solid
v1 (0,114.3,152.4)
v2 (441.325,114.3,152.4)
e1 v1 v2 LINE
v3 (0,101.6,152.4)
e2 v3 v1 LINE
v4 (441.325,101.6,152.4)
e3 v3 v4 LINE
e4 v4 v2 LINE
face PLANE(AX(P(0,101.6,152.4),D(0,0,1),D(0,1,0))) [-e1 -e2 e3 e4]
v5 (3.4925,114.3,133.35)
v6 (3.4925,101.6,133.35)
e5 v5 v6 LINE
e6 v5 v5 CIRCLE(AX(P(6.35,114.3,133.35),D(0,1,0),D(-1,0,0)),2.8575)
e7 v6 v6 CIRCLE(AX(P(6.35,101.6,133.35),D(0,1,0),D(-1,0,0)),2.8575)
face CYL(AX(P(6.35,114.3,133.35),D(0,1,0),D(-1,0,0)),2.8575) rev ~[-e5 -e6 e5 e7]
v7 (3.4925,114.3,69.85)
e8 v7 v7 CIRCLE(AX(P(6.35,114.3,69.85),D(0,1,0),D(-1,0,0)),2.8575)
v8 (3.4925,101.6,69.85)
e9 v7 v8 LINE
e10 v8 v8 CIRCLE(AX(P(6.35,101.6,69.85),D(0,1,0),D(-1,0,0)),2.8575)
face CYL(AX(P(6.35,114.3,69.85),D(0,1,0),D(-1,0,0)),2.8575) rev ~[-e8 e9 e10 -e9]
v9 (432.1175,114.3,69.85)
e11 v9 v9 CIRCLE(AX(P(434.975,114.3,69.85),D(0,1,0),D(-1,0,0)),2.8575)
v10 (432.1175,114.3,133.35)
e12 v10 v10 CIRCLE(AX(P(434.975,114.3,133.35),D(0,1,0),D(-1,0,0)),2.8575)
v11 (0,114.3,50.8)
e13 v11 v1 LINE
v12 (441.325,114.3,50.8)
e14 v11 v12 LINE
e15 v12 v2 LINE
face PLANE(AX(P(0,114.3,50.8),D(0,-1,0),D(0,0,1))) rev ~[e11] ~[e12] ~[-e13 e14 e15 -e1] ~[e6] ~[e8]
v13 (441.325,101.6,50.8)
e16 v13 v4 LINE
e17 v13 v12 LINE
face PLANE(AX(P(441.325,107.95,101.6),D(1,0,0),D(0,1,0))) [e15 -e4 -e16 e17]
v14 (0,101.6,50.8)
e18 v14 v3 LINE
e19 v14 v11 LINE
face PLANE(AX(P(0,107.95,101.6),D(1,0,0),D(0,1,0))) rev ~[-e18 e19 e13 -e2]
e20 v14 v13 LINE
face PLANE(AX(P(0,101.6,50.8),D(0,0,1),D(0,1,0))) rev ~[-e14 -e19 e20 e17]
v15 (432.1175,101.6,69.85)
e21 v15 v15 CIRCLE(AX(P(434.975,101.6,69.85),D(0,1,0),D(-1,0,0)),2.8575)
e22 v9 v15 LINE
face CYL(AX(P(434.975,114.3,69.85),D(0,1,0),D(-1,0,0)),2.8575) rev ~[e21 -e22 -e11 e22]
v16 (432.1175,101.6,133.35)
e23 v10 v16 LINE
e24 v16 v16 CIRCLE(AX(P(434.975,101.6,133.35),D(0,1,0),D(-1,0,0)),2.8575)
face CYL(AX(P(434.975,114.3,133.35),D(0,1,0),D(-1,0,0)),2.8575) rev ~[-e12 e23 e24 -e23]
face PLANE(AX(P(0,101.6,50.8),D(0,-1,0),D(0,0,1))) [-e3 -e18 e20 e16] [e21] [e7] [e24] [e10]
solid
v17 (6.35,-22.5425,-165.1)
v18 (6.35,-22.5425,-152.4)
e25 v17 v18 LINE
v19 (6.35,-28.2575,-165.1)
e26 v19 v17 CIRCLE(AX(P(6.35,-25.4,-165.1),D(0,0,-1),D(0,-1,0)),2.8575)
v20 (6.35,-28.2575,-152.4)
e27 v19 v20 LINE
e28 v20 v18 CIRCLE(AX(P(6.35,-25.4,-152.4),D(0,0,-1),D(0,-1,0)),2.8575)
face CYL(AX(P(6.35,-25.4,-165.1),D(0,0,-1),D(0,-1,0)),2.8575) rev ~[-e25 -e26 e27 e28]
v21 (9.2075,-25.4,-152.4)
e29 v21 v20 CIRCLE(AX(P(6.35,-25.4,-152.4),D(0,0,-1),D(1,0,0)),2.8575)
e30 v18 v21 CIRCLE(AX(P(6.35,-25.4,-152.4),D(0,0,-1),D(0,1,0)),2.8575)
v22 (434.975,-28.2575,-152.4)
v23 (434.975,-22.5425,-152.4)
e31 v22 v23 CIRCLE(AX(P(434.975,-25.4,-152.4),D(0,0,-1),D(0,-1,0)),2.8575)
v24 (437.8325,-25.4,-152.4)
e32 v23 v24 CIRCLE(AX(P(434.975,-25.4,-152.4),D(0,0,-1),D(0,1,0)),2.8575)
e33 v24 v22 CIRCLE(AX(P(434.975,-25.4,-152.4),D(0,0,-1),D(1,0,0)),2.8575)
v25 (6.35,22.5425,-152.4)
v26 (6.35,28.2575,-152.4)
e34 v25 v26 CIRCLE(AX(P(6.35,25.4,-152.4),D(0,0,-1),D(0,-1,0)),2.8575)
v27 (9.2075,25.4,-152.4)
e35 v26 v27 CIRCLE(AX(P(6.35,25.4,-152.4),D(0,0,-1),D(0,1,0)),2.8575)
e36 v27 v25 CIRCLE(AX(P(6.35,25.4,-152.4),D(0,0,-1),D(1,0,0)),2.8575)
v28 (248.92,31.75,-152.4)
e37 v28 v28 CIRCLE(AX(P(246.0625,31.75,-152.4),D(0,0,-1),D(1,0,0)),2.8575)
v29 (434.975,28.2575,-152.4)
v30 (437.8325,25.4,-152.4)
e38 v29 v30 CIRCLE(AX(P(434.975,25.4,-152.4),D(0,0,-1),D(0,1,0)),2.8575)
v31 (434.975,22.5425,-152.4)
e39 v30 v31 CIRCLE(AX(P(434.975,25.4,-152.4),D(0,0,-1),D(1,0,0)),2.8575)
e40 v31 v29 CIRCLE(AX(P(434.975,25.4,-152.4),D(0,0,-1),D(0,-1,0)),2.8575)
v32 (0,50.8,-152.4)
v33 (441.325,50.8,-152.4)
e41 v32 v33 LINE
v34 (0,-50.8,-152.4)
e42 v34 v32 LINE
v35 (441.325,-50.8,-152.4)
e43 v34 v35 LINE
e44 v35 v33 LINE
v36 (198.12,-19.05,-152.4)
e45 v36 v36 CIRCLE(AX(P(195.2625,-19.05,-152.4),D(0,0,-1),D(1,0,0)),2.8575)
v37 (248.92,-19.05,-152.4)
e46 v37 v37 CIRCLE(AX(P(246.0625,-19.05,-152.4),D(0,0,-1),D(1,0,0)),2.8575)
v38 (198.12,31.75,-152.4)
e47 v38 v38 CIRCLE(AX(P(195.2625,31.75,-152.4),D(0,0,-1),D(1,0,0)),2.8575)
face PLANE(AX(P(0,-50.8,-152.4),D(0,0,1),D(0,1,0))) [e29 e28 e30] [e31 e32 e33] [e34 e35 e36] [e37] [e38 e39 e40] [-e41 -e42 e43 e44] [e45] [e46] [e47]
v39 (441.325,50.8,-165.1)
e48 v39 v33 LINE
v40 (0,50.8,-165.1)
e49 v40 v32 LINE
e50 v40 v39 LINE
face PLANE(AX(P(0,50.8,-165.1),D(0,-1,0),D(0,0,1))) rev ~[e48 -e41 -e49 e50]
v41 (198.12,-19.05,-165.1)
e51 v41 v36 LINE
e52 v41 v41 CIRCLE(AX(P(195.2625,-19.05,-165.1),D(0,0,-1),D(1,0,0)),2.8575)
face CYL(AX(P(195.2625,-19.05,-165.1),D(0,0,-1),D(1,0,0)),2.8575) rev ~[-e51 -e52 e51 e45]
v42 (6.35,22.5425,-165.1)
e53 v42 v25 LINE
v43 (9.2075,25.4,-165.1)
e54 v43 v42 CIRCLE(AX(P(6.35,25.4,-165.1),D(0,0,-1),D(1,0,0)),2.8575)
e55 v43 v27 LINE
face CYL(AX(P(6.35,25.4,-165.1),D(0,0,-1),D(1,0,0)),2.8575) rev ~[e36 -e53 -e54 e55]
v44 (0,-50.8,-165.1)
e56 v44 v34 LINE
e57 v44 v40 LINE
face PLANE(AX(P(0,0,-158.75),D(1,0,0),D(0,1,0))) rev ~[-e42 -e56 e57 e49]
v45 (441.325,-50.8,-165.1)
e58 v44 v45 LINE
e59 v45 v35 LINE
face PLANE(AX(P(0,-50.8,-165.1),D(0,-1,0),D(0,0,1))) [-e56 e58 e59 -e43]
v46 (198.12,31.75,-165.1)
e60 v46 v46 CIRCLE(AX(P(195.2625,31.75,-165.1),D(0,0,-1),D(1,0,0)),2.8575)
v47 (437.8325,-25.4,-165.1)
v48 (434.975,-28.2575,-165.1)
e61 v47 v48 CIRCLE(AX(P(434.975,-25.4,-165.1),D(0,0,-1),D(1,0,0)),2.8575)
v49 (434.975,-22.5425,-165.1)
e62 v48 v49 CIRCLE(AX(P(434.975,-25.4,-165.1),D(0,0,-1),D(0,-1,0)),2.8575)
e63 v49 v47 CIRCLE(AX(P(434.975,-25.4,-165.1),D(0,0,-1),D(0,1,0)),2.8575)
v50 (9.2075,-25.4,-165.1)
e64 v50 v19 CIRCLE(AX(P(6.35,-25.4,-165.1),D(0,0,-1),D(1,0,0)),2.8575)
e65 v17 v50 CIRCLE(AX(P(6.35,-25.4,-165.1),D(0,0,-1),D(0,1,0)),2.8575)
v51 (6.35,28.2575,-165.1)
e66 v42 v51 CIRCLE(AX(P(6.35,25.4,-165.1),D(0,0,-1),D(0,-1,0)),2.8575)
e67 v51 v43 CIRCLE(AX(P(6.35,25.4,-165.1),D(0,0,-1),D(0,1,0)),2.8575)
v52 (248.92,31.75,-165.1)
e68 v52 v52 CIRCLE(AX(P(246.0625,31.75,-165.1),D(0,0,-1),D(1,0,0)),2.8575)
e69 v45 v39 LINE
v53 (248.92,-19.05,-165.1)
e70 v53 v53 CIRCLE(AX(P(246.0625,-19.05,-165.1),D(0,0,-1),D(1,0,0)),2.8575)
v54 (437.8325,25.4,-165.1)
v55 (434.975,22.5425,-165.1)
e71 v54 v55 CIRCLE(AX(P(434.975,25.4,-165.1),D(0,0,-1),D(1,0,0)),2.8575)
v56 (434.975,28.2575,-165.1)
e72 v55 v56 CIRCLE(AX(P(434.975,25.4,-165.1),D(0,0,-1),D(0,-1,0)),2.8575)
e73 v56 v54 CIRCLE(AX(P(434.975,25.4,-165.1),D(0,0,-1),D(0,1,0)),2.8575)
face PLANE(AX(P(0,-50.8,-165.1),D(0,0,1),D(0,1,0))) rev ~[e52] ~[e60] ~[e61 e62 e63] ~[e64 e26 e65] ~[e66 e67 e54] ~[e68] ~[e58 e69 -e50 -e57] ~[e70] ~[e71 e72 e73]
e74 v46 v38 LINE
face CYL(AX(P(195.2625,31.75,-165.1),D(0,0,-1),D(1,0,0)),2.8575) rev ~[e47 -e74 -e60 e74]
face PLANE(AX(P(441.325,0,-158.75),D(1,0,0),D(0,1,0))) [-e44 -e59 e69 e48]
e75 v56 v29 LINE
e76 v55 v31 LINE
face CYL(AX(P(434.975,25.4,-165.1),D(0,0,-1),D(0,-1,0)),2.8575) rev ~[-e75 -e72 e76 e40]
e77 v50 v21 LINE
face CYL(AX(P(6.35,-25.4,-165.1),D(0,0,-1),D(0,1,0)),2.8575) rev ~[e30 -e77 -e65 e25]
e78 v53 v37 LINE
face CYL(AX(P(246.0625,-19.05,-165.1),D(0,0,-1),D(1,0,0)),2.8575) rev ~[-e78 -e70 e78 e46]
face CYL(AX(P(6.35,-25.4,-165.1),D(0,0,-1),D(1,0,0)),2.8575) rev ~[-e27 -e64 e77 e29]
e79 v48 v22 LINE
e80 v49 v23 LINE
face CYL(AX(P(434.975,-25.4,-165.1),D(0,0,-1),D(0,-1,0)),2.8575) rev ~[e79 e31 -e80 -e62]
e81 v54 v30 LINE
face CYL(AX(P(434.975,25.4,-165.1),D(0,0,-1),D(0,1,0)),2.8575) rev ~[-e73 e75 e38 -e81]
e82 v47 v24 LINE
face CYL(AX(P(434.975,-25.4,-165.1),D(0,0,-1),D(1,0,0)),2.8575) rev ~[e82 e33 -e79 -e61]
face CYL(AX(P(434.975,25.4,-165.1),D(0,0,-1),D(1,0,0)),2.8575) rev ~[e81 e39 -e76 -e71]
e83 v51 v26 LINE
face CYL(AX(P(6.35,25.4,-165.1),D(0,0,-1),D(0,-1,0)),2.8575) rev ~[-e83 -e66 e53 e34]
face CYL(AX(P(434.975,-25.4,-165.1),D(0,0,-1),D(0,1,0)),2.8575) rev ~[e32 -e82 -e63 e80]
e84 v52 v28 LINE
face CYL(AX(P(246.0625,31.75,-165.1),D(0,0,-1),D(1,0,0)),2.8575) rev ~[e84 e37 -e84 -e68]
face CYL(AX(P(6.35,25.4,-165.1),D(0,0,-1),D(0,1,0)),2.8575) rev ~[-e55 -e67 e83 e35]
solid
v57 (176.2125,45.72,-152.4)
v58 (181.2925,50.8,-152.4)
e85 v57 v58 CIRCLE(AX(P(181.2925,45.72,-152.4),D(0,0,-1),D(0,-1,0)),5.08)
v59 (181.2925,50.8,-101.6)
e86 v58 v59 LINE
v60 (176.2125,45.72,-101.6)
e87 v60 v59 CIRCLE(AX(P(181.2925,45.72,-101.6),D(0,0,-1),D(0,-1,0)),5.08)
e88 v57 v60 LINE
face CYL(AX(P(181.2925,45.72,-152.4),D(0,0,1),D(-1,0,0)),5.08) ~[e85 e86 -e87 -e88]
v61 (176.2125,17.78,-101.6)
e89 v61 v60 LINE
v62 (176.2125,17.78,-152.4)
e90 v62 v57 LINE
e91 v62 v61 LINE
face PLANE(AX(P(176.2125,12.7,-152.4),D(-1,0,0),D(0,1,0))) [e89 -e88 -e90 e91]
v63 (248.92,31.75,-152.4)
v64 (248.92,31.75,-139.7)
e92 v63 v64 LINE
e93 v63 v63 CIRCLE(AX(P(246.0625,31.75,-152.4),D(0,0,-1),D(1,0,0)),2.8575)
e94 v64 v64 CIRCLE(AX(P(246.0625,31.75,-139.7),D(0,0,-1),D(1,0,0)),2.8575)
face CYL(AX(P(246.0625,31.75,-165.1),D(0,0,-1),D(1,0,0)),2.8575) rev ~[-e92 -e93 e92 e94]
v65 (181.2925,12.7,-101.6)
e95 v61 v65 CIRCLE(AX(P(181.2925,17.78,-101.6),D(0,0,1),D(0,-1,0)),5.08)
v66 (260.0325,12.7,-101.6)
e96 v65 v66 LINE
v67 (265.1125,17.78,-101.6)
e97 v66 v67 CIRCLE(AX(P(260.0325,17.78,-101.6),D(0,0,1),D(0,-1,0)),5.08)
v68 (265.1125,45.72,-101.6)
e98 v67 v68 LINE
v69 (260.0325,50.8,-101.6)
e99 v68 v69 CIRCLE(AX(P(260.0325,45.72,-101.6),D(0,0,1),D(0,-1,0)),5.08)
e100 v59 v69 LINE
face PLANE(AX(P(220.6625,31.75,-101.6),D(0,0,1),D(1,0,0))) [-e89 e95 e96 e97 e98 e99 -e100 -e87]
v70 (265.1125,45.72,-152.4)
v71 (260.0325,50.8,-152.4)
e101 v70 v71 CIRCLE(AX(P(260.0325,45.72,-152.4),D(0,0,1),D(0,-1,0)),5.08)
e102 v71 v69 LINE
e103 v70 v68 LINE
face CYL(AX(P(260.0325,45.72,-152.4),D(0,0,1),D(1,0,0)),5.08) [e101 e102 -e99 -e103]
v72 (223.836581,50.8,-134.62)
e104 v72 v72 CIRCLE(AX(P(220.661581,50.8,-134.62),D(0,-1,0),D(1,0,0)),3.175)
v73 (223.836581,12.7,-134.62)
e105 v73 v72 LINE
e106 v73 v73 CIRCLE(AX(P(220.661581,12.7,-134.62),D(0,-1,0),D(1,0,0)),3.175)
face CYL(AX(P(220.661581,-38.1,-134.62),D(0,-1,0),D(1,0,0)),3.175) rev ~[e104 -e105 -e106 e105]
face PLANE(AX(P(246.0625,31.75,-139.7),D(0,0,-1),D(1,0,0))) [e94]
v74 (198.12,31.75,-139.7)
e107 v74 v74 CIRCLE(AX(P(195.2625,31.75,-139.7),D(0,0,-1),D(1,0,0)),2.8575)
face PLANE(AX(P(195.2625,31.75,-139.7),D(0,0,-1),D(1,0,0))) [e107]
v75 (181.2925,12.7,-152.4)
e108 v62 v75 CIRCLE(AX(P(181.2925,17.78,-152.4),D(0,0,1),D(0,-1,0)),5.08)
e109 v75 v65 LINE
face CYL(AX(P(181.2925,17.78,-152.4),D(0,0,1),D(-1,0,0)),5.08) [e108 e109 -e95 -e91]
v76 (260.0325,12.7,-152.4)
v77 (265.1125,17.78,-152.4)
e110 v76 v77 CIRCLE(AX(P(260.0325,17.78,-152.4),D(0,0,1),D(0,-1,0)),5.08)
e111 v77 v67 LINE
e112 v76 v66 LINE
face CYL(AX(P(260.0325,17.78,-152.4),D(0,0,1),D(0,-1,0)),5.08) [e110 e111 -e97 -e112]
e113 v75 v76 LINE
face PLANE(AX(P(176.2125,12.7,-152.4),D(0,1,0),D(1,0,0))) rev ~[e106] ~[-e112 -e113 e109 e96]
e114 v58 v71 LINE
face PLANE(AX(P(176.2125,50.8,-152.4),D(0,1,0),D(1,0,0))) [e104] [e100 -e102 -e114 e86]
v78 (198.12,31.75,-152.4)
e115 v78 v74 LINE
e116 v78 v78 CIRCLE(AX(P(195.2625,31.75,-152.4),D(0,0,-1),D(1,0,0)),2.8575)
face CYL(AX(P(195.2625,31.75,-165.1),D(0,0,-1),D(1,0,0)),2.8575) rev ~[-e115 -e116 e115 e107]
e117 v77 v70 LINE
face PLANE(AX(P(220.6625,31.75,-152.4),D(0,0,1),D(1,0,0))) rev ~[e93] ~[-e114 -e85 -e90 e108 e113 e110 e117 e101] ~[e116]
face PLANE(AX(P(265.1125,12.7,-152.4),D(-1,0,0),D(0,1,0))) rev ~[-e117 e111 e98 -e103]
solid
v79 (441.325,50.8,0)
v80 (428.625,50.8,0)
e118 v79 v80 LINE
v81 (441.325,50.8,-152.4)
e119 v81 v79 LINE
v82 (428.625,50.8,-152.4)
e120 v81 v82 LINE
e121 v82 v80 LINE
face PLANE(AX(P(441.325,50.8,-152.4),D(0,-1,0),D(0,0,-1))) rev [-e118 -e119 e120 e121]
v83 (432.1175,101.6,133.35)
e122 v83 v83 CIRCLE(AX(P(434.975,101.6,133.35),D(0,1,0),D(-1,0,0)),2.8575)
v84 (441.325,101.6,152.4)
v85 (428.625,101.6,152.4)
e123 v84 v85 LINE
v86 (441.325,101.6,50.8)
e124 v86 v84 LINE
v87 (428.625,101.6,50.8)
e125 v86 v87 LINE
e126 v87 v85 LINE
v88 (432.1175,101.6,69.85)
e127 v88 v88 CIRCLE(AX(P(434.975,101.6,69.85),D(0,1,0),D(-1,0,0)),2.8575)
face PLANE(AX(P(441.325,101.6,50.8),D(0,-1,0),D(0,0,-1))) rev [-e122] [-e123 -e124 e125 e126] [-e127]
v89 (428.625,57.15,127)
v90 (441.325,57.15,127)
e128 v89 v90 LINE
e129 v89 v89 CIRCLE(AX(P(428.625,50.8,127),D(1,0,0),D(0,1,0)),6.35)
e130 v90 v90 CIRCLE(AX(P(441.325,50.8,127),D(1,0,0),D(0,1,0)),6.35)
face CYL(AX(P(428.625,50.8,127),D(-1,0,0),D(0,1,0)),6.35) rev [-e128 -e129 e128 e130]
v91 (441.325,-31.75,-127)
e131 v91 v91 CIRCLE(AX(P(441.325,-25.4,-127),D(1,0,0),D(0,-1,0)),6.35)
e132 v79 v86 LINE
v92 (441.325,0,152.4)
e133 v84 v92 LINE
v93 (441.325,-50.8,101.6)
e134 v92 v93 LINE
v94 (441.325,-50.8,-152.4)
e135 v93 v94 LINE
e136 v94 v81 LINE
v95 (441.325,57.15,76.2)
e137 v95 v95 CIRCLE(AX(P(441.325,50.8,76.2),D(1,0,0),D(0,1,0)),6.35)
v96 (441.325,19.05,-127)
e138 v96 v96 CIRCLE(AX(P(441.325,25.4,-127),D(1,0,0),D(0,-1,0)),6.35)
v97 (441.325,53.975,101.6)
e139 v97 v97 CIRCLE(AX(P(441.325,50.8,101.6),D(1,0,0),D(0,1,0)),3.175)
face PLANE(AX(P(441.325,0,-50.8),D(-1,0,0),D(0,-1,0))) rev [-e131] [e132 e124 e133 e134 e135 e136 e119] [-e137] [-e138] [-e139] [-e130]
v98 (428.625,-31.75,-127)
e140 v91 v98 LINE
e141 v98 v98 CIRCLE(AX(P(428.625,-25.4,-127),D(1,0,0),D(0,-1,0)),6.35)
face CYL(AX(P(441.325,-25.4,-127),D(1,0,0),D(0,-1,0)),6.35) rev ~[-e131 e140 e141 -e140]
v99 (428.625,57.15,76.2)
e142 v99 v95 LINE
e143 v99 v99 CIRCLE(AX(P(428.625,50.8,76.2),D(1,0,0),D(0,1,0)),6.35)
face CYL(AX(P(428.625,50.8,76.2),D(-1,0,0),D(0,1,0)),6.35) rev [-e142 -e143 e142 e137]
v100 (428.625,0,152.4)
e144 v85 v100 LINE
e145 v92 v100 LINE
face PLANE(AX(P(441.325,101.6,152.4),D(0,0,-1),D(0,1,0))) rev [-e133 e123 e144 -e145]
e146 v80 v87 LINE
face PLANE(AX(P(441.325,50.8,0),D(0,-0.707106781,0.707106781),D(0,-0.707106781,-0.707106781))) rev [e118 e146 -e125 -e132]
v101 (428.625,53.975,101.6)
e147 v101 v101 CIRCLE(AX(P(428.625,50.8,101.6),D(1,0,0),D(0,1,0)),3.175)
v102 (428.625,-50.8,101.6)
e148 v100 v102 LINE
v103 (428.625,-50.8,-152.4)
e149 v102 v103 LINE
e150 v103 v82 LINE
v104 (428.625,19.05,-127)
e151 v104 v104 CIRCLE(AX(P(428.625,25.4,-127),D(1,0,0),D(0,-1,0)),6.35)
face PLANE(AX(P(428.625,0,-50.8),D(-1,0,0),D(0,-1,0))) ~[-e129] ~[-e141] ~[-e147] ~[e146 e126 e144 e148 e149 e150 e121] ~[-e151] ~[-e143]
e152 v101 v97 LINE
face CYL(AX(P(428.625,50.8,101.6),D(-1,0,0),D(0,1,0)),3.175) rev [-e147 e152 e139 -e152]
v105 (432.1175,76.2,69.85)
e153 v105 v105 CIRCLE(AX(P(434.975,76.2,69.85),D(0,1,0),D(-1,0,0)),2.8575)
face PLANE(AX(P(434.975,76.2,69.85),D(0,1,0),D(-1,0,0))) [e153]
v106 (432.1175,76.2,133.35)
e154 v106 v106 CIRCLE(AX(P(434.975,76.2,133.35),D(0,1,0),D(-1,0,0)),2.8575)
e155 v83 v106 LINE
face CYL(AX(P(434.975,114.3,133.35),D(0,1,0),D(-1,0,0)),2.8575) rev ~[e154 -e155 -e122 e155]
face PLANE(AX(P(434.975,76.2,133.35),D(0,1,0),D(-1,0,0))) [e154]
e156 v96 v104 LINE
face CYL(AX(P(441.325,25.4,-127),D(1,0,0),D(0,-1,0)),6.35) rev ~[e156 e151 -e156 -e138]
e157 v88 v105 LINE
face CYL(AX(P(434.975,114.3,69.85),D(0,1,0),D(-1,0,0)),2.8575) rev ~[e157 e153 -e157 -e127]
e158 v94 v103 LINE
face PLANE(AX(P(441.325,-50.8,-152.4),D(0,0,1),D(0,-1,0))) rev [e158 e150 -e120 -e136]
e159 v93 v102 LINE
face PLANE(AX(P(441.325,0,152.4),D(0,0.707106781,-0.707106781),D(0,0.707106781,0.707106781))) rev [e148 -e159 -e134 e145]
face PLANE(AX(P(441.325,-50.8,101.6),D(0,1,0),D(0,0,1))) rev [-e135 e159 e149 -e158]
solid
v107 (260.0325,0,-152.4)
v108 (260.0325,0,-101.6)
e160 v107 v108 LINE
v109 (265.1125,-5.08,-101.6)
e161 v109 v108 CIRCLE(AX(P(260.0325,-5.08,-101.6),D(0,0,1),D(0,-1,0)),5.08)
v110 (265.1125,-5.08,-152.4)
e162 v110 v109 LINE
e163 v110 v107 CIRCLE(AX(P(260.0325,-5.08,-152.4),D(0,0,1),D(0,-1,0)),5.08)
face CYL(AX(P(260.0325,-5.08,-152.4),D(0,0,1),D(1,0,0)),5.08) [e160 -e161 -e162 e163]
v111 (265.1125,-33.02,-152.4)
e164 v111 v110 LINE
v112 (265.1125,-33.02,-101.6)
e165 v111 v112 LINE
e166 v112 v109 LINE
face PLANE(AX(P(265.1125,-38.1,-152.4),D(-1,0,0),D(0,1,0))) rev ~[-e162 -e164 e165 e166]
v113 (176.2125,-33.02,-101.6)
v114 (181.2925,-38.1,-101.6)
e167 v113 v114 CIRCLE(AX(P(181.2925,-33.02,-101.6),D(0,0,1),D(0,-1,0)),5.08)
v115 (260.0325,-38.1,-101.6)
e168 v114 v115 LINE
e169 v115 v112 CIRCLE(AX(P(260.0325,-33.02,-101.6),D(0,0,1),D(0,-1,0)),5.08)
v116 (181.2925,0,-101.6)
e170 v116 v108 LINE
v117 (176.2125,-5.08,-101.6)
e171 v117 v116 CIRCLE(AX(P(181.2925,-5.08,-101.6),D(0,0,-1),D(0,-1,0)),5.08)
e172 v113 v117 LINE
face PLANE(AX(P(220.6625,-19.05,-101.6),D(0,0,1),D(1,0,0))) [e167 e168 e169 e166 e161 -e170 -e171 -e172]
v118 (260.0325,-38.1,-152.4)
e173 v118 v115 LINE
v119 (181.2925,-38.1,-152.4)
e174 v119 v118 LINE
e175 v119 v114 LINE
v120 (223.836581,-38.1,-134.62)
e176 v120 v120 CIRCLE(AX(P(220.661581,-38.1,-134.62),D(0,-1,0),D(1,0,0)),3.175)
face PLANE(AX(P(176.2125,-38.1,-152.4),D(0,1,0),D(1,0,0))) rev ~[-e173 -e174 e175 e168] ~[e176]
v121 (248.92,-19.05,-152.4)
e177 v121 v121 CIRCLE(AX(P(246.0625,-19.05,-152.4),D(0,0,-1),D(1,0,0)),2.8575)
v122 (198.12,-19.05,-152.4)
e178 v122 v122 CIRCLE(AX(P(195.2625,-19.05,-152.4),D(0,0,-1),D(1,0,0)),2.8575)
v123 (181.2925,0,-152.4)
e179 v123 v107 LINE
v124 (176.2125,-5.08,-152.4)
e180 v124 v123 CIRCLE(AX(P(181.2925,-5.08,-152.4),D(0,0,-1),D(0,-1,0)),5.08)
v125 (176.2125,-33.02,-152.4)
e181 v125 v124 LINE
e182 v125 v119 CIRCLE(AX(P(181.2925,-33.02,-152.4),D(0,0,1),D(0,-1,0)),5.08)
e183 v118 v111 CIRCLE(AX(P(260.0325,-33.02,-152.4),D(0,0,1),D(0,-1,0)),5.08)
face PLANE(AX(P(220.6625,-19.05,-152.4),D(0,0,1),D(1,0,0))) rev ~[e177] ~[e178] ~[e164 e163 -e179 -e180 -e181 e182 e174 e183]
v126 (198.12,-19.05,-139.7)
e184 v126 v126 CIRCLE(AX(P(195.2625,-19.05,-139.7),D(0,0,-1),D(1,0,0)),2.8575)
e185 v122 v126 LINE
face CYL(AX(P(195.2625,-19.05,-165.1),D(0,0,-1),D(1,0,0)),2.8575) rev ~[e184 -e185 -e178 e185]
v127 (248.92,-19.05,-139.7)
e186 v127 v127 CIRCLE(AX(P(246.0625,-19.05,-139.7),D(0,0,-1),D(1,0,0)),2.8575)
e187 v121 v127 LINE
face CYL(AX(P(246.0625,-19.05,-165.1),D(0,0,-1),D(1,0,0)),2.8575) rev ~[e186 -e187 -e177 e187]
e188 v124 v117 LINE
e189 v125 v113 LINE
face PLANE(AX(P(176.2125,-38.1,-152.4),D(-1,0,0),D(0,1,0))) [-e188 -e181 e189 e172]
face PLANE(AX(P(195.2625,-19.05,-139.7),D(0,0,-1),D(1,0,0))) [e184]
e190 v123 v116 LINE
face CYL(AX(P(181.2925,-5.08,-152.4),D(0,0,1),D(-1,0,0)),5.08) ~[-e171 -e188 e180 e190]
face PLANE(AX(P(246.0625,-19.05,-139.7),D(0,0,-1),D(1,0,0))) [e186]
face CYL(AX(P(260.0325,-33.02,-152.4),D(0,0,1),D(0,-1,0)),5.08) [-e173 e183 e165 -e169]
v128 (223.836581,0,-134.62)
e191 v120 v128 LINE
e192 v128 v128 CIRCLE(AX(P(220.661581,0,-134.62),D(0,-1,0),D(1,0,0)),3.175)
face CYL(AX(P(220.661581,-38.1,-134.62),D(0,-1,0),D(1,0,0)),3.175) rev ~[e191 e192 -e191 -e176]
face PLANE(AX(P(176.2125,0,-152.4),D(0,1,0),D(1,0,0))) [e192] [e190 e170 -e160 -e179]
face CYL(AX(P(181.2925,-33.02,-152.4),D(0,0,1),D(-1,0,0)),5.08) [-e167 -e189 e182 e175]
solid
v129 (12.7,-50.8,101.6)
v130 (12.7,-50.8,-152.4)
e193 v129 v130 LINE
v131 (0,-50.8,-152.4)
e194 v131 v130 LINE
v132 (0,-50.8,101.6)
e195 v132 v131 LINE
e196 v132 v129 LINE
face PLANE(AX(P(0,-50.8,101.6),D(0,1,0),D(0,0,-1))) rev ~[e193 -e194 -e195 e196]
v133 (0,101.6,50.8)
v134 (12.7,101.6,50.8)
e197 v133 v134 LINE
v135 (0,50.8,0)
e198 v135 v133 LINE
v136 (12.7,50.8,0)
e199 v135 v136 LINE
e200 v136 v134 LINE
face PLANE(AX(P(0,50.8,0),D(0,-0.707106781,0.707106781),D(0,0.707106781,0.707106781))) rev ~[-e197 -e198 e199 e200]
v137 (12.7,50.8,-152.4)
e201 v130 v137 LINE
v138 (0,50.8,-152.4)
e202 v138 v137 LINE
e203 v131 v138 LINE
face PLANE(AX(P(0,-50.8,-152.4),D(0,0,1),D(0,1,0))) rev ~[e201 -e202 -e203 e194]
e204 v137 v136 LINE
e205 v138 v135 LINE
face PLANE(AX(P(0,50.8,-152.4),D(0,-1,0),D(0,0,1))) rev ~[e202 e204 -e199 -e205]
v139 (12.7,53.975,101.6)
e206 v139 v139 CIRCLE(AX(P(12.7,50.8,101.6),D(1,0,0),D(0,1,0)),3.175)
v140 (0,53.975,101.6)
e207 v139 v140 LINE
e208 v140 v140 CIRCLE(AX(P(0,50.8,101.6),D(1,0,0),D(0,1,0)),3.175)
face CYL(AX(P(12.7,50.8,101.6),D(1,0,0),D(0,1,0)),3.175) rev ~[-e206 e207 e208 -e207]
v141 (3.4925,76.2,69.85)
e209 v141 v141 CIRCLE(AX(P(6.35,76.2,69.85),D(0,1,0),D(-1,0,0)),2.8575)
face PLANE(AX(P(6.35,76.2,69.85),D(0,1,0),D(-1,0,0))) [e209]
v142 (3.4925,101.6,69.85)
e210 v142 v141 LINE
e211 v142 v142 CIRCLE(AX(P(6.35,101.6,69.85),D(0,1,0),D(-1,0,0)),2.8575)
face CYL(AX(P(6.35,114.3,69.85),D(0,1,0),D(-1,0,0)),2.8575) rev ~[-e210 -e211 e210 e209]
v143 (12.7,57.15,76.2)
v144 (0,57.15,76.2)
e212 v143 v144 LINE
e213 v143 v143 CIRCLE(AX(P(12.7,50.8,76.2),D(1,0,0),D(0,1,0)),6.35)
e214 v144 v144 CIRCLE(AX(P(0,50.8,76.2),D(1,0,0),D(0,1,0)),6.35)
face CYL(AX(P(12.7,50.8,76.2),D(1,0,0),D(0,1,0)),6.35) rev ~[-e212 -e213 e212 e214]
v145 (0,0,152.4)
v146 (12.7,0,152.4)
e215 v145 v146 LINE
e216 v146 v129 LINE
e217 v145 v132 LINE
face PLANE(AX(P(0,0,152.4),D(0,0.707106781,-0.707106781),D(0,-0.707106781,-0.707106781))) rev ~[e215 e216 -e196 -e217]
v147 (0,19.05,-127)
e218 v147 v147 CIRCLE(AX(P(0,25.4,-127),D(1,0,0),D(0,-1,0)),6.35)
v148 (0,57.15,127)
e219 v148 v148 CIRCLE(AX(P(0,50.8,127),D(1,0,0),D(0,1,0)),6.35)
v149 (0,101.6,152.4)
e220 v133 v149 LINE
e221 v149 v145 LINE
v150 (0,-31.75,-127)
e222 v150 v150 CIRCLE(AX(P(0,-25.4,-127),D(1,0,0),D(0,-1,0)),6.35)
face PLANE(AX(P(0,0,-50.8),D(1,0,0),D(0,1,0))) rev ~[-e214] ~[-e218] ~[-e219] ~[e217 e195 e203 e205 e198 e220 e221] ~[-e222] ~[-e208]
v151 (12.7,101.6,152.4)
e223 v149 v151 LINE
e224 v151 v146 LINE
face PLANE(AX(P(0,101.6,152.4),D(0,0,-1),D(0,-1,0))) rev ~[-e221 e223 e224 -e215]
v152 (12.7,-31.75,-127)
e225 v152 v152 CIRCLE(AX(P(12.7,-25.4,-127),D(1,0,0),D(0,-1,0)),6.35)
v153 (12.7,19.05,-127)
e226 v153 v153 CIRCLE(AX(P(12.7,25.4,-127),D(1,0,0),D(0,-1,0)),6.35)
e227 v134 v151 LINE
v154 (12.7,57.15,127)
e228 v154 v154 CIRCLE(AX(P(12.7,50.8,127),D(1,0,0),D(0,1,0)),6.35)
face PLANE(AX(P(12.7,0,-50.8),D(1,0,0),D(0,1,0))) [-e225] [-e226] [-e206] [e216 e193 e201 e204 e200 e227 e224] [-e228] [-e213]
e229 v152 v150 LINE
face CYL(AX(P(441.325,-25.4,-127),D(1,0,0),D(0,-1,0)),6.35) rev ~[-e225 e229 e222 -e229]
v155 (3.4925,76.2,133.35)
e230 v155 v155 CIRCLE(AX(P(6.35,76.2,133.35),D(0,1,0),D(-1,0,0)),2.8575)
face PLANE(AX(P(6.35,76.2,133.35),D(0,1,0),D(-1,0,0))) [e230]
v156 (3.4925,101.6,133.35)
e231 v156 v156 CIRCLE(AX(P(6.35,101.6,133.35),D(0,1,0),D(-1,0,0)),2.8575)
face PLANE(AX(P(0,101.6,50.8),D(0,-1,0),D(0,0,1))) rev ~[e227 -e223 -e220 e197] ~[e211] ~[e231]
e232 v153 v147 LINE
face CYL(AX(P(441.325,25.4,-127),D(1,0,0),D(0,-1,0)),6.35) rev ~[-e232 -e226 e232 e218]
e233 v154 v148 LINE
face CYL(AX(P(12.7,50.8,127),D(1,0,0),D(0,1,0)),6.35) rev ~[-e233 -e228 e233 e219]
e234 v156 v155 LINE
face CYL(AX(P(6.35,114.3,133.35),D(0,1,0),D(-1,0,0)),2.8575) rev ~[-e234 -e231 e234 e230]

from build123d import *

# Parameters (mm, degrees)
F0_W      = 50.8
F0_H      = 101.6
F1_DEPTH  = 12.7
F2_W      = 101.6
F2_H      = 12.7
F3_DEPTH  = 441.325
F4_R      = 6.35
F4_R_2    = 3.175
F5_DEPTH  = 25.4
F8_W      = 12.7
F8_H      = 101.6
F9_DEPTH  = 441.325
F11_DEPTH = 508
F12_W     = 88.9
F12_H     = 38.1
F13_DEPTH = 50.8
F14_R     = 5.08
F14_2_R   = 5.08
F15_R     = 2.8575
F16_DEPTH = 25.4
F17_R     = 3.175
F18_DEPTH = 101.6
F19_R     = 2.8575
F20_DEPTH = 38.1
F21_R     = 2.8575
F22_DEPTH = 38.1


# Not quite as in the source:
# - a feature names something its author has since deleted; it is built from what else it names


with BuildPart() as f1:
    # F0 (on Right) → F1 (new body)
    with BuildSketch(Plane.YZ):
        Polygon((50.8, 50.8), (-50.8, 50.8), (-50.8, -152.4), (50.8, -152.4), (50.8, 0), align=None)
        with Locations((76.2, 101.6)):
            Rectangle(F0_W, F0_H)
        Polygon((50.8, 152.4), (0, 152.4), (-50.8, 101.6), (-50.8, 50.8), (50.8, 50.8), align=None)
        Polygon((101.6, 50.8), (50.8, 50.8), (50.8, 0), align=None)
    extrude(amount=F1_DEPTH)

    # F4 (on face) → F5 (cut)
    with BuildSketch(Plane.YZ.offset(12.7)):
        with Locations((50.8, 127)):
            Circle(F4_R)
        with Locations((50.8, 101.6)):
            Circle(F4_R_2)
        with Locations((50.8, 76.2)):
            Circle(F4_R)
    extrude(amount=-F5_DEPTH, mode=Mode.SUBTRACT)


with BuildPart() as f3:
    # F2 (on Right) → F3 (new body)
    with BuildSketch(Plane.YZ):
        with Locations((0, -158.75)):
            Rectangle(F2_W, F2_H)
    extrude(amount=F3_DEPTH)


with BuildPart() as f7_1:
    # F7: instance of F1
    add(f1.part.mirror(Plane.YZ.offset(220.6625)))


with BuildPart() as f9:
    # F8 (on Right) → F9 (new body)
    with BuildSketch(Plane.YZ):
        with Locations((107.95, 101.6)):
            Rectangle(F8_W, F8_H)
    extrude(amount=F9_DEPTH)


with BuildPart() as f11_tool:
    # F10 (on face) → F11 (new body)
    with BuildSketch(Plane.YZ.offset(441.325)):
        with BuildLine():
            Line((-25.4, -127), (-19.05, -127))
            ThreePointArc((-19.05, -127), (-25.4, -120.65), (-31.75, -127))
            Line((-31.75, -127), (-25.4, -127))
        make_face()
        with BuildLine():
            ThreePointArc((-31.75, -127), (-25.4, -133.35), (-19.05, -127))
            Line((-19.05, -127), (-25.4, -127))
            Line((-25.4, -127), (-31.75, -127))
        make_face()
        with BuildLine():
            ThreePointArc((31.75, -127), (25.4, -120.65), (19.05, -127))
            Line((19.05, -127), (25.4, -127))
            Line((25.4, -127), (31.75, -127))
        make_face()
        with BuildLine():
            Line((25.4, -127), (19.05, -127))
            ThreePointArc((19.05, -127), (25.4, -133.35), (31.75, -127))
            Line((31.75, -127), (25.4, -127))
        make_face()
    extrude(amount=-F11_DEPTH)


with BuildPart() as f1_1:
    add(f1.part)

    # F11: cut by f11_tool
    add(f11_tool.part, mode=Mode.SUBTRACT)


with BuildPart() as f7_1_1:
    add(f7_1.part)

    # F11: cut by f11_tool
    add(f11_tool.part, mode=Mode.SUBTRACT)


with BuildPart() as f13:
    # F12 (on face) → F13 (new body)
    with BuildSketch(Plane.XY.offset(-152.4)):
        with Locations((220.6625, -19.05)):
            Rectangle(F12_W, F12_H)
    extrude(amount=F13_DEPTH)

    # F14
    f14_edges = [f13.edges().sort_by_distance(p)[0] for p in [
        (176.2125, -38.1, -127),
        (176.2125, 0, -127),
        (265.1125, -38.1, -127),
        (265.1125, 0, -127),
    ]]
    fillet(f14_edges, radius=F14_R)


with BuildPart() as f13b:
    # F12 (on face) → F13, piece 2 (new body)
    with BuildSketch(Plane.XY.offset(-152.4)):
        with Locations((220.6625, 31.75)):
            Rectangle(F12_W, F12_H)
    extrude(amount=F13_DEPTH)

    # F14#2
    f14_2_edges = [f13b.edges().sort_by_distance(p)[0] for p in [
        (176.2125, 12.7, -127),
        (265.1125, 12.7, -127),
        (265.1125, 50.8, -127),
        (176.2125, 50.8, -127),
    ]]
    fillet(f14_2_edges, radius=F14_2_R)


with BuildPart() as f16_tool:
    # F15 (on face) → F16 (new body)
    with BuildSketch(Plane(origin=(0, 0, -165.1), x_dir=(1, 0, 0), z_dir=(0, 0, -1))):
        with Locations((195.2625, 19.05)):
            Circle(F15_R)
        with Locations((246.0625, 19.05)):
            Circle(F15_R)
        with Locations((195.2625, -31.75)):
            Circle(F15_R)
        with Locations((246.0625, -31.75)):
            Circle(F15_R)
    extrude(amount=-F16_DEPTH)


with BuildPart() as f3_1:
    add(f3.part)

    # F16: cut by f16_tool
    add(f16_tool.part, mode=Mode.SUBTRACT)

    # F21 (on face) → F22 (cut)
    with BuildSketch(Plane(origin=(0, 0, -165.1), x_dir=(1, 0, 0), z_dir=(0, 0, -1))):
        with Locations((195.2625, 19.05)):
            Circle(F21_R)
        with Locations((246.0625, 19.05)):
            Circle(F21_R)
        with Locations((195.2625, -31.75)):
            Circle(F21_R)
        with Locations((246.0625, -31.75)):
            Circle(F21_R)
        with BuildLine():
            Line((434.975, 22.5425), (434.975, 28.2575))
            ThreePointArc((434.975, 28.2575), (432.1175, 25.4), (434.975, 22.5425))
        make_face()
        with BuildLine():
            ThreePointArc((437.8325, 25.4), (436.9955576272, 27.4205576272), (434.975, 28.2575))
            Line((434.975, 28.2575), (434.975, 22.5425))
            ThreePointArc((434.975, 22.5425), (436.9955576272, 23.3794423728), (437.8325, 25.4))
        make_face()
        with BuildLine():
            Line((434.975, -28.2575), (434.975, -22.5425))
            ThreePointArc((434.975, -22.5425), (432.1175, -25.4), (434.975, -28.2575))
        make_face()
        with BuildLine():
            ThreePointArc((437.8325, -25.4), (436.9955576272, -23.3794423728), (434.975, -22.5425))
            Line((434.975, -22.5425), (434.975, -28.2575))
            ThreePointArc((434.975, -28.2575), (436.9955576272, -27.4205576272), (437.8325, -25.4))
        make_face()
        with BuildLine():
            Line((6.35, -28.2575), (6.35, -22.5425))
            ThreePointArc((6.35, -22.5425), (3.4925, -25.4), (6.35, -28.2575))
        make_face()
        with BuildLine():
            ThreePointArc((9.2075, -25.4), (8.3705576272, -23.3794423728), (6.35, -22.5425))
            Line((6.35, -22.5425), (6.35, -28.2575))
            ThreePointArc((6.35, -28.2575), (8.3705576272, -27.4205576272), (9.2075, -25.4))
        make_face()
        with BuildLine():
            Line((6.35, 22.5425), (6.35, 28.2575))
            ThreePointArc((6.35, 28.2575), (3.4925, 25.4), (6.35, 22.5425))
        make_face()
        with BuildLine():
            ThreePointArc((9.2075, 25.4), (8.3705576272, 27.4205576272), (6.35, 28.2575))
            Line((6.35, 28.2575), (6.35, 22.5425))
            ThreePointArc((6.35, 22.5425), (8.3705576272, 23.3794423728), (9.2075, 25.4))
        make_face()
    extrude(amount=-F22_DEPTH, mode=Mode.SUBTRACT)


with BuildPart() as f13_1:
    add(f13.part)

    # F16: cut by f16_tool
    add(f16_tool.part, mode=Mode.SUBTRACT)


with BuildPart() as f13b_1:
    add(f13b.part)

    # F16: cut by f16_tool
    add(f16_tool.part, mode=Mode.SUBTRACT)


with BuildPart() as f18_tool:
    # F17 (on face) → F18 (new body)
    with BuildSketch(Plane.XZ.offset(38.1)):
        with Locations((220.6615805626, -134.62)):
            Circle(F17_R)
    extrude(amount=-F18_DEPTH)


with BuildPart() as f13_2:
    add(f13_1.part)

    # F18: cut by f18_tool
    add(f18_tool.part, mode=Mode.SUBTRACT)


with BuildPart() as f13b_2:
    add(f13b_1.part)

    # F18: cut by f18_tool
    add(f18_tool.part, mode=Mode.SUBTRACT)


with BuildPart() as f20_tool:
    # F19 (on face) → F20 (new body)
    with BuildSketch(Plane(origin=(0, 114.3, 0), x_dir=(-1, 0, 0), z_dir=(0, 1, 0))):
        with Locations((-6.35, 133.35)):
            Circle(F19_R)
        with Locations((-6.35, 69.85)):
            Circle(F19_R)
        with Locations((-434.975, 133.35)):
            Circle(F19_R)
        with Locations((-434.975, 69.85)):
            Circle(F19_R)
    extrude(amount=-F20_DEPTH)


with BuildPart() as f1_2:
    add(f1_1.part)

    # F20: cut by f20_tool
    add(f20_tool.part, mode=Mode.SUBTRACT)


with BuildPart() as f7_1_2:
    add(f7_1_1.part)

    # F20: cut by f20_tool
    add(f20_tool.part, mode=Mode.SUBTRACT)


with BuildPart() as f9_1:
    add(f9.part)

    # F20: cut by f20_tool
    add(f20_tool.part, mode=Mode.SUBTRACT)


solid = Compound([f3_1.part, f13_2.part, f13b_2.part, f1_2.part, f7_1_2.part, f9_1.part])
